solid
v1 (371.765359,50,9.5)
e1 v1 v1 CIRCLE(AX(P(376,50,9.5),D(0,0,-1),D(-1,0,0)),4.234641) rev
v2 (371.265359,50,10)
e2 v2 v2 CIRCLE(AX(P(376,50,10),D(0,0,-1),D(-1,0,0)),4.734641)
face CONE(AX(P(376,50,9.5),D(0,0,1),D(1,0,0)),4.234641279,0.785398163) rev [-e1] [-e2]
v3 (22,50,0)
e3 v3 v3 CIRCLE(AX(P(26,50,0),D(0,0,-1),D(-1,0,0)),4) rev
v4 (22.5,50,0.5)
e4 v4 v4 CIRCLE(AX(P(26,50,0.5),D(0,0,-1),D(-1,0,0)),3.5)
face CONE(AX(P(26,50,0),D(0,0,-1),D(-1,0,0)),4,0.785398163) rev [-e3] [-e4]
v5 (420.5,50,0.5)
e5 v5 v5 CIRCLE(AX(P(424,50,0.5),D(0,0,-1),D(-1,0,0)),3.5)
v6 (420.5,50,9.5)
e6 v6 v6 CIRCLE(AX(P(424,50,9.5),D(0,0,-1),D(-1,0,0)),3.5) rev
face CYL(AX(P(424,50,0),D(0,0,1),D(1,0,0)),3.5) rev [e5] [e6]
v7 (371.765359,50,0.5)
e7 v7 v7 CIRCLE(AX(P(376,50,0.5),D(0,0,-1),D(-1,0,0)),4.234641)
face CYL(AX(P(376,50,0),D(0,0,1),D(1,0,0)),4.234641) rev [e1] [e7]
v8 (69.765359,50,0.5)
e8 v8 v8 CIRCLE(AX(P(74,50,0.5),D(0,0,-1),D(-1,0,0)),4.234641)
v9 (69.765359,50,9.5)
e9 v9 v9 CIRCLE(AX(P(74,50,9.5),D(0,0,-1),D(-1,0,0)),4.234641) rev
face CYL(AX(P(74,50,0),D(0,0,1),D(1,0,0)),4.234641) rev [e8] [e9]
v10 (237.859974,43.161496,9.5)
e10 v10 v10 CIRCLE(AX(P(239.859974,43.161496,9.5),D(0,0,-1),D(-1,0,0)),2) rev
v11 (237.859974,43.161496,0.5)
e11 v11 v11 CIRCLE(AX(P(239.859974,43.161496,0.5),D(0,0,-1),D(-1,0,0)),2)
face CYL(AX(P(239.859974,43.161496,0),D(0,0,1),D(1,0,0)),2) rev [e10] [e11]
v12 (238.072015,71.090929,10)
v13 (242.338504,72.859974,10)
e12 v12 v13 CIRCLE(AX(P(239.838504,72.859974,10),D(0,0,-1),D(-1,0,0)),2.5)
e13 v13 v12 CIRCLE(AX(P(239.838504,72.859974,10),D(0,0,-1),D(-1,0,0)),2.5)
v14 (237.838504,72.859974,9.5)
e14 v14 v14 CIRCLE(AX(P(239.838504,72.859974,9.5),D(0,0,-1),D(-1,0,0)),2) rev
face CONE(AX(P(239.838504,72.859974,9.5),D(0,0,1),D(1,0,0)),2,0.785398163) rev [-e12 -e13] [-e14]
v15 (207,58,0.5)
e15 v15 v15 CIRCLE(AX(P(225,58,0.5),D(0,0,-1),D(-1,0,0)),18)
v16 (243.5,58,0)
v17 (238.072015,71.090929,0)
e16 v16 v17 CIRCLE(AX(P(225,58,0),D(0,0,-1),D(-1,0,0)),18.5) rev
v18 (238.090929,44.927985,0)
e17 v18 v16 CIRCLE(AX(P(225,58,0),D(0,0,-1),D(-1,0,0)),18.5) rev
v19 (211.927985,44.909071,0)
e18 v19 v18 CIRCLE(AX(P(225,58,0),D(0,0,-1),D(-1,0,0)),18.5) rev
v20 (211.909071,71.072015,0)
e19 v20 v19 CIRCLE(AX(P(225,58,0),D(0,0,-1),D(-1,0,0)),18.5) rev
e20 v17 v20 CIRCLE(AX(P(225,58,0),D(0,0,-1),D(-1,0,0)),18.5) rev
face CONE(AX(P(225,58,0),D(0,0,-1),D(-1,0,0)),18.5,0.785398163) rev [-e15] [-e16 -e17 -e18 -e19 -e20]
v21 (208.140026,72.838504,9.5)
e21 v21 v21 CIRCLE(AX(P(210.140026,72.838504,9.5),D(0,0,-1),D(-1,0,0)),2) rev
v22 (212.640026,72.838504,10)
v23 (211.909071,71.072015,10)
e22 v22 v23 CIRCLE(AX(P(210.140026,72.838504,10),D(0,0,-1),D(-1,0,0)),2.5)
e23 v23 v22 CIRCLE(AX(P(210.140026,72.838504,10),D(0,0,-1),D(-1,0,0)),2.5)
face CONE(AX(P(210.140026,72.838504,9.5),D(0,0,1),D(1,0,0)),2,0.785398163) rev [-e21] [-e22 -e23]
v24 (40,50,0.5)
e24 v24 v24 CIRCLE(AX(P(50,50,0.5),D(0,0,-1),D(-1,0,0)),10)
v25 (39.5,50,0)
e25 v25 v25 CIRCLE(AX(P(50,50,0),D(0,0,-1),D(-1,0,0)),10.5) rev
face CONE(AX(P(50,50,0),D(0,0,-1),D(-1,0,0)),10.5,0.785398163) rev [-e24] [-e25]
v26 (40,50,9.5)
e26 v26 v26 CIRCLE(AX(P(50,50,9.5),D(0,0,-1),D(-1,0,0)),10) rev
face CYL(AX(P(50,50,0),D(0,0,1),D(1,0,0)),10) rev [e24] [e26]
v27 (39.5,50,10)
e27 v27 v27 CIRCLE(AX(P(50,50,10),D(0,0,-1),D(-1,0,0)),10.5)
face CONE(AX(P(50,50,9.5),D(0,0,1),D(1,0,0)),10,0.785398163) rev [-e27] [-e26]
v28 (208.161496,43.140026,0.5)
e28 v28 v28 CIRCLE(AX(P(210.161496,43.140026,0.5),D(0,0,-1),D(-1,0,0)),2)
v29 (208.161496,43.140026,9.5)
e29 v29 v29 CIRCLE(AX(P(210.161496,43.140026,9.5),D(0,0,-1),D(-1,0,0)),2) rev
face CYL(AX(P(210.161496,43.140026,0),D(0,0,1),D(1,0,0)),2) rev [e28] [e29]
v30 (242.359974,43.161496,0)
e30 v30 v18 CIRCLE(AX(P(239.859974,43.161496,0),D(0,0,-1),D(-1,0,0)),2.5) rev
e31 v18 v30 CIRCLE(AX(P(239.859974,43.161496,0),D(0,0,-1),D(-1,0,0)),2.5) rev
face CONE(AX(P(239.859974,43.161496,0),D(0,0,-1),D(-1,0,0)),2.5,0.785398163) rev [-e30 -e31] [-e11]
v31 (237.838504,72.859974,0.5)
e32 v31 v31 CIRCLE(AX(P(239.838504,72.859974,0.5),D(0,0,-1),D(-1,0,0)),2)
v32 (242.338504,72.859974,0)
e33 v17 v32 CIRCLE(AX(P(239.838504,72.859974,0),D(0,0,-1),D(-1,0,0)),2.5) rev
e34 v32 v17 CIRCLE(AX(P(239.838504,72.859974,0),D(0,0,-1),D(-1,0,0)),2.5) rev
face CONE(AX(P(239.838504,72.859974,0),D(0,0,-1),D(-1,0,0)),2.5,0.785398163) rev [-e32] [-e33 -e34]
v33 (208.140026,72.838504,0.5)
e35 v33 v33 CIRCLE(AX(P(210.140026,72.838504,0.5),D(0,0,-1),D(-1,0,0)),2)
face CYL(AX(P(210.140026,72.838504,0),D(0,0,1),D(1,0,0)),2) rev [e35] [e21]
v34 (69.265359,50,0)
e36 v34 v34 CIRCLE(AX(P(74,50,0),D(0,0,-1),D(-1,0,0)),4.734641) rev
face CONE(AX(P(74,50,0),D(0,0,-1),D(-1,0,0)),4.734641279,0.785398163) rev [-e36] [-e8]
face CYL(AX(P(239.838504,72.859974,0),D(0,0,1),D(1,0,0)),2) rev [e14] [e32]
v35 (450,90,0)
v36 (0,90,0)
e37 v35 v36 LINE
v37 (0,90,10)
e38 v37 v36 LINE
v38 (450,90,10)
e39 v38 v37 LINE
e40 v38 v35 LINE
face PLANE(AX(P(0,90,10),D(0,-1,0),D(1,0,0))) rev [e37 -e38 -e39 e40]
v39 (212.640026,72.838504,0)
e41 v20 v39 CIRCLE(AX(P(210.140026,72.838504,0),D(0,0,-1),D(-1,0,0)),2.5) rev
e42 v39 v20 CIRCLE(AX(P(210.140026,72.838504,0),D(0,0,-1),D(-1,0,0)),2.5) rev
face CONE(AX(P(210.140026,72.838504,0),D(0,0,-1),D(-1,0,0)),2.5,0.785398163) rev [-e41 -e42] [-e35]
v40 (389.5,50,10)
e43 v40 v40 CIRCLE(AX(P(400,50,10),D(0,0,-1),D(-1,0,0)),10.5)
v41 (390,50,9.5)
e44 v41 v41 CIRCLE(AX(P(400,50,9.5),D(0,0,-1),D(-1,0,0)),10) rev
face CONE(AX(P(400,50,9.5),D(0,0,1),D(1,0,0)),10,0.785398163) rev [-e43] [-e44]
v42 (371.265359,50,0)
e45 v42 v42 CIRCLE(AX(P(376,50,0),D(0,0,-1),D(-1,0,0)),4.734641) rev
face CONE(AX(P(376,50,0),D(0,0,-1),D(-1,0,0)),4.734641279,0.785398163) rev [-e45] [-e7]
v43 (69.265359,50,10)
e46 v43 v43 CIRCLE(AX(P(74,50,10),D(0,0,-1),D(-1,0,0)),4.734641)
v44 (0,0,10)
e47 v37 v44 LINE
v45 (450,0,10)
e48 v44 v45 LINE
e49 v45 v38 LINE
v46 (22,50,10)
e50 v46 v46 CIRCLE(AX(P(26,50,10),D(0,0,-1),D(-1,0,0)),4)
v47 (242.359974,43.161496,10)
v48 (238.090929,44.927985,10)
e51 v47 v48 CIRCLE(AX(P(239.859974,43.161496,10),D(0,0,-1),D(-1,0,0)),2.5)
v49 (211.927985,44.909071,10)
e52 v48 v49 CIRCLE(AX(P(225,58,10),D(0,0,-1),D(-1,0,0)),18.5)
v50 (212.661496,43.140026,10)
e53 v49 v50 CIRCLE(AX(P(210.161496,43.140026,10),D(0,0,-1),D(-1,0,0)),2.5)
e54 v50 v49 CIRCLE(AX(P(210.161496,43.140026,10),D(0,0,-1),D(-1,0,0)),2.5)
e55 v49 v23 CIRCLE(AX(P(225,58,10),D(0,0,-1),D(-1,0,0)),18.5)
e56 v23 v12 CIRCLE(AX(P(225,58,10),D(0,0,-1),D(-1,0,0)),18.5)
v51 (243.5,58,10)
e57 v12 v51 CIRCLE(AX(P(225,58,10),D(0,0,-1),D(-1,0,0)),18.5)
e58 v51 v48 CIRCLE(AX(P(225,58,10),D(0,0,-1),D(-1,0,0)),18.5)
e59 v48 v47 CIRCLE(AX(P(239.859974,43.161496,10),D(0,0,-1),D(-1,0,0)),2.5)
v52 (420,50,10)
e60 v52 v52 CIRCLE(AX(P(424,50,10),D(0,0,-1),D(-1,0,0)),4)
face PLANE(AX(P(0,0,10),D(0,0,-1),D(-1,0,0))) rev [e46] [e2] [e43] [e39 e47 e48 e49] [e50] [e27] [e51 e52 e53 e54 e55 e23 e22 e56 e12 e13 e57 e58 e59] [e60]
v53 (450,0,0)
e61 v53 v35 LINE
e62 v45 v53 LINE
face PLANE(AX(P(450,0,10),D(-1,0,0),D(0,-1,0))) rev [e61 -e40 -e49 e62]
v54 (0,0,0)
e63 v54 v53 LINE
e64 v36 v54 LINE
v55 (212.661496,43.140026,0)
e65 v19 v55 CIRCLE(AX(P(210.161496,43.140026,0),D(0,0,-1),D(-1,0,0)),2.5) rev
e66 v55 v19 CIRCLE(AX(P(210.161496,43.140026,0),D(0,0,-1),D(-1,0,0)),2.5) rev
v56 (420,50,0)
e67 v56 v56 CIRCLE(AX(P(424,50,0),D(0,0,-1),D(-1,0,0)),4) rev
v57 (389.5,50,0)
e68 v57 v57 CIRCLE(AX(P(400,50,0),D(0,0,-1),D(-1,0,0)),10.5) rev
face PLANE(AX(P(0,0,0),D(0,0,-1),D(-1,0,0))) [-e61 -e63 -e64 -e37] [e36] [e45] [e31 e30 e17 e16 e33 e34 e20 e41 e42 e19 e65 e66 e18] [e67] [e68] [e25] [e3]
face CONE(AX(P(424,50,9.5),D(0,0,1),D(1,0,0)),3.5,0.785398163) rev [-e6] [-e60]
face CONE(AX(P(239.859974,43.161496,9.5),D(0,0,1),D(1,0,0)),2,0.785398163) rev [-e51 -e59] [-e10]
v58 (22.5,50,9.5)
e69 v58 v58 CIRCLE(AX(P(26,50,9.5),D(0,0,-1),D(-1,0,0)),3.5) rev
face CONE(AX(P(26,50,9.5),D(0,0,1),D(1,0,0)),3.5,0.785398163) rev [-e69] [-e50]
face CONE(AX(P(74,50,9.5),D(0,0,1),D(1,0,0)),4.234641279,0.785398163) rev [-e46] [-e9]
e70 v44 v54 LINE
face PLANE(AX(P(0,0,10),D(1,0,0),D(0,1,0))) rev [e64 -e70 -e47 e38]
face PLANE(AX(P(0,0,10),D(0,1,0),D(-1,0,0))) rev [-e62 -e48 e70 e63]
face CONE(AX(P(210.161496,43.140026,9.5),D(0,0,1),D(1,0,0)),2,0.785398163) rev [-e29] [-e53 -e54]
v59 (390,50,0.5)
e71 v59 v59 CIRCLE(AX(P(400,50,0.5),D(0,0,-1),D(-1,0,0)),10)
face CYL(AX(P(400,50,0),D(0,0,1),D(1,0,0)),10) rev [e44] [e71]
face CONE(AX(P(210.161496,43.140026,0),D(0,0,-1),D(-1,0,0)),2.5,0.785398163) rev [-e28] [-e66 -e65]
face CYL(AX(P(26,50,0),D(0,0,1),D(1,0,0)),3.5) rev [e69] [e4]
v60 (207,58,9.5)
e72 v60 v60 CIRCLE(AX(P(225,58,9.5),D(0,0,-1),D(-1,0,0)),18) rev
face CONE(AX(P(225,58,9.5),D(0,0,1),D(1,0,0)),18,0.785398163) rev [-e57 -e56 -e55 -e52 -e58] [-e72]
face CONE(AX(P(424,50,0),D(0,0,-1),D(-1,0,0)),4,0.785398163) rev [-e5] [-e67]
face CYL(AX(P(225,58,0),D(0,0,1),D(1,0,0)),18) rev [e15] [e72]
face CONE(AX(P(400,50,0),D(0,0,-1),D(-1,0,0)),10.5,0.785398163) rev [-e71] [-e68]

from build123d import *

# Parameters (mm, degrees)
CROQUIS2_W              = 450
CROQUIS2_H              = 90
SALIENTE_EXTRUIR1_DEPTH = 10
CROQUIS6_R              = 18
CROQUIS6_R_2            = 2
CORTAR_EXTRUIR1_DEPTH   = 460.020696701
CHAFL_N5_SIZE           = 0.5
CROQUIS10_R             = 3.5
CROQUIS10_R_2           = 4.234641279
CROQUIS10_R_3           = 10
CORTAR_EXTRUIR3_DEPTH   = 460.020696701
CHAFL_N6_SIZE           = 0.5


with BuildPart() as part:
    # Croquis2 → Saliente-Extruir1 (new body)
    with BuildSketch(Plane.XY):
        with Locations((225, 45)):
            Rectangle(CROQUIS2_W, CROQUIS2_H)
    extrude(amount=SALIENTE_EXTRUIR1_DEPTH)

    # Croquis6 → Cortar-Extruir1 (cut, through all)
    with BuildSketch(Plane.XY.offset(10)):
        with Locations((225, 58)):
            Circle(CROQUIS6_R)
        with Locations((210.140026495, 72.838503544)):
            Circle(CROQUIS6_R_2)
        with Locations((239.838503544, 72.859973505)):
            Circle(CROQUIS6_R_2)
        with Locations((239.859973505, 43.161496456)):
            Circle(CROQUIS6_R_2)
        with Locations((210.161496456, 43.140026495)):
            Circle(CROQUIS6_R_2)
    extrude(amount=-CORTAR_EXTRUIR1_DEPTH, mode=Mode.SUBTRACT)

    # Chaflán5
    chafl_n5_edges = [part.edges().sort_by_distance(p)[0] for p in [
        (207, 58, 0),
        (207, 58, 10),
        (208.140026495, 72.838503544, 0),
        (208.140026495, 72.838503544, 10),
        (237.838503544, 72.859973505, 0),
        (237.838503544, 72.859973505, 10),
        (237.859973505, 43.161496456, 0),
        (237.859973505, 43.161496456, 10),
        (208.161496456, 43.140026495, 0),
        (208.161496456, 43.140026495, 10),
    ]]
    chamfer(chafl_n5_edges, length=CHAFL_N5_SIZE - 0.0001)  # a hair under: the kernel refuses the full size

    # Croquis10 → Cortar-Extruir3 (cut, through all)
    with BuildSketch(Plane.XY.offset(10)):
        with Locations((26, 50)):
            Circle(CROQUIS10_R)
        with Locations((74, 50)):
            Circle(CROQUIS10_R_2)
        with Locations(Location((376, 50, 0), (0, 0, 180))):
            Circle(CROQUIS10_R_2)
        with Locations(Location((400, 50, 0), (0, 0, 180))):
            Circle(CROQUIS10_R_3)
        with Locations((50, 50)):
            Circle(CROQUIS10_R_3)
        with Locations(Location((424, 50, 0), (0, 0, 180))):
            Circle(CROQUIS10_R)
    extrude(amount=-CORTAR_EXTRUIR3_DEPTH, mode=Mode.SUBTRACT)

    # Chaflán6
    chafl_n6_edges = [part.edges().sort_by_distance(p)[0] for p in [
        (427.5, 50, 0),
        (427.5, 50, 10),
        (22.5, 50, 0),
        (22.5, 50, 10),
        (69.765358721, 50, 0),
        (69.765358721, 50, 10),
        (380.234641279, 50, 0),
        (380.234641279, 50, 10),
        (410, 50, 0),
        (410, 50, 10),
        (40, 50, 0),
        (40, 50, 10),
    ]]
    chamfer(chafl_n6_edges, length=CHAFL_N6_SIZE)


solid = part.part
